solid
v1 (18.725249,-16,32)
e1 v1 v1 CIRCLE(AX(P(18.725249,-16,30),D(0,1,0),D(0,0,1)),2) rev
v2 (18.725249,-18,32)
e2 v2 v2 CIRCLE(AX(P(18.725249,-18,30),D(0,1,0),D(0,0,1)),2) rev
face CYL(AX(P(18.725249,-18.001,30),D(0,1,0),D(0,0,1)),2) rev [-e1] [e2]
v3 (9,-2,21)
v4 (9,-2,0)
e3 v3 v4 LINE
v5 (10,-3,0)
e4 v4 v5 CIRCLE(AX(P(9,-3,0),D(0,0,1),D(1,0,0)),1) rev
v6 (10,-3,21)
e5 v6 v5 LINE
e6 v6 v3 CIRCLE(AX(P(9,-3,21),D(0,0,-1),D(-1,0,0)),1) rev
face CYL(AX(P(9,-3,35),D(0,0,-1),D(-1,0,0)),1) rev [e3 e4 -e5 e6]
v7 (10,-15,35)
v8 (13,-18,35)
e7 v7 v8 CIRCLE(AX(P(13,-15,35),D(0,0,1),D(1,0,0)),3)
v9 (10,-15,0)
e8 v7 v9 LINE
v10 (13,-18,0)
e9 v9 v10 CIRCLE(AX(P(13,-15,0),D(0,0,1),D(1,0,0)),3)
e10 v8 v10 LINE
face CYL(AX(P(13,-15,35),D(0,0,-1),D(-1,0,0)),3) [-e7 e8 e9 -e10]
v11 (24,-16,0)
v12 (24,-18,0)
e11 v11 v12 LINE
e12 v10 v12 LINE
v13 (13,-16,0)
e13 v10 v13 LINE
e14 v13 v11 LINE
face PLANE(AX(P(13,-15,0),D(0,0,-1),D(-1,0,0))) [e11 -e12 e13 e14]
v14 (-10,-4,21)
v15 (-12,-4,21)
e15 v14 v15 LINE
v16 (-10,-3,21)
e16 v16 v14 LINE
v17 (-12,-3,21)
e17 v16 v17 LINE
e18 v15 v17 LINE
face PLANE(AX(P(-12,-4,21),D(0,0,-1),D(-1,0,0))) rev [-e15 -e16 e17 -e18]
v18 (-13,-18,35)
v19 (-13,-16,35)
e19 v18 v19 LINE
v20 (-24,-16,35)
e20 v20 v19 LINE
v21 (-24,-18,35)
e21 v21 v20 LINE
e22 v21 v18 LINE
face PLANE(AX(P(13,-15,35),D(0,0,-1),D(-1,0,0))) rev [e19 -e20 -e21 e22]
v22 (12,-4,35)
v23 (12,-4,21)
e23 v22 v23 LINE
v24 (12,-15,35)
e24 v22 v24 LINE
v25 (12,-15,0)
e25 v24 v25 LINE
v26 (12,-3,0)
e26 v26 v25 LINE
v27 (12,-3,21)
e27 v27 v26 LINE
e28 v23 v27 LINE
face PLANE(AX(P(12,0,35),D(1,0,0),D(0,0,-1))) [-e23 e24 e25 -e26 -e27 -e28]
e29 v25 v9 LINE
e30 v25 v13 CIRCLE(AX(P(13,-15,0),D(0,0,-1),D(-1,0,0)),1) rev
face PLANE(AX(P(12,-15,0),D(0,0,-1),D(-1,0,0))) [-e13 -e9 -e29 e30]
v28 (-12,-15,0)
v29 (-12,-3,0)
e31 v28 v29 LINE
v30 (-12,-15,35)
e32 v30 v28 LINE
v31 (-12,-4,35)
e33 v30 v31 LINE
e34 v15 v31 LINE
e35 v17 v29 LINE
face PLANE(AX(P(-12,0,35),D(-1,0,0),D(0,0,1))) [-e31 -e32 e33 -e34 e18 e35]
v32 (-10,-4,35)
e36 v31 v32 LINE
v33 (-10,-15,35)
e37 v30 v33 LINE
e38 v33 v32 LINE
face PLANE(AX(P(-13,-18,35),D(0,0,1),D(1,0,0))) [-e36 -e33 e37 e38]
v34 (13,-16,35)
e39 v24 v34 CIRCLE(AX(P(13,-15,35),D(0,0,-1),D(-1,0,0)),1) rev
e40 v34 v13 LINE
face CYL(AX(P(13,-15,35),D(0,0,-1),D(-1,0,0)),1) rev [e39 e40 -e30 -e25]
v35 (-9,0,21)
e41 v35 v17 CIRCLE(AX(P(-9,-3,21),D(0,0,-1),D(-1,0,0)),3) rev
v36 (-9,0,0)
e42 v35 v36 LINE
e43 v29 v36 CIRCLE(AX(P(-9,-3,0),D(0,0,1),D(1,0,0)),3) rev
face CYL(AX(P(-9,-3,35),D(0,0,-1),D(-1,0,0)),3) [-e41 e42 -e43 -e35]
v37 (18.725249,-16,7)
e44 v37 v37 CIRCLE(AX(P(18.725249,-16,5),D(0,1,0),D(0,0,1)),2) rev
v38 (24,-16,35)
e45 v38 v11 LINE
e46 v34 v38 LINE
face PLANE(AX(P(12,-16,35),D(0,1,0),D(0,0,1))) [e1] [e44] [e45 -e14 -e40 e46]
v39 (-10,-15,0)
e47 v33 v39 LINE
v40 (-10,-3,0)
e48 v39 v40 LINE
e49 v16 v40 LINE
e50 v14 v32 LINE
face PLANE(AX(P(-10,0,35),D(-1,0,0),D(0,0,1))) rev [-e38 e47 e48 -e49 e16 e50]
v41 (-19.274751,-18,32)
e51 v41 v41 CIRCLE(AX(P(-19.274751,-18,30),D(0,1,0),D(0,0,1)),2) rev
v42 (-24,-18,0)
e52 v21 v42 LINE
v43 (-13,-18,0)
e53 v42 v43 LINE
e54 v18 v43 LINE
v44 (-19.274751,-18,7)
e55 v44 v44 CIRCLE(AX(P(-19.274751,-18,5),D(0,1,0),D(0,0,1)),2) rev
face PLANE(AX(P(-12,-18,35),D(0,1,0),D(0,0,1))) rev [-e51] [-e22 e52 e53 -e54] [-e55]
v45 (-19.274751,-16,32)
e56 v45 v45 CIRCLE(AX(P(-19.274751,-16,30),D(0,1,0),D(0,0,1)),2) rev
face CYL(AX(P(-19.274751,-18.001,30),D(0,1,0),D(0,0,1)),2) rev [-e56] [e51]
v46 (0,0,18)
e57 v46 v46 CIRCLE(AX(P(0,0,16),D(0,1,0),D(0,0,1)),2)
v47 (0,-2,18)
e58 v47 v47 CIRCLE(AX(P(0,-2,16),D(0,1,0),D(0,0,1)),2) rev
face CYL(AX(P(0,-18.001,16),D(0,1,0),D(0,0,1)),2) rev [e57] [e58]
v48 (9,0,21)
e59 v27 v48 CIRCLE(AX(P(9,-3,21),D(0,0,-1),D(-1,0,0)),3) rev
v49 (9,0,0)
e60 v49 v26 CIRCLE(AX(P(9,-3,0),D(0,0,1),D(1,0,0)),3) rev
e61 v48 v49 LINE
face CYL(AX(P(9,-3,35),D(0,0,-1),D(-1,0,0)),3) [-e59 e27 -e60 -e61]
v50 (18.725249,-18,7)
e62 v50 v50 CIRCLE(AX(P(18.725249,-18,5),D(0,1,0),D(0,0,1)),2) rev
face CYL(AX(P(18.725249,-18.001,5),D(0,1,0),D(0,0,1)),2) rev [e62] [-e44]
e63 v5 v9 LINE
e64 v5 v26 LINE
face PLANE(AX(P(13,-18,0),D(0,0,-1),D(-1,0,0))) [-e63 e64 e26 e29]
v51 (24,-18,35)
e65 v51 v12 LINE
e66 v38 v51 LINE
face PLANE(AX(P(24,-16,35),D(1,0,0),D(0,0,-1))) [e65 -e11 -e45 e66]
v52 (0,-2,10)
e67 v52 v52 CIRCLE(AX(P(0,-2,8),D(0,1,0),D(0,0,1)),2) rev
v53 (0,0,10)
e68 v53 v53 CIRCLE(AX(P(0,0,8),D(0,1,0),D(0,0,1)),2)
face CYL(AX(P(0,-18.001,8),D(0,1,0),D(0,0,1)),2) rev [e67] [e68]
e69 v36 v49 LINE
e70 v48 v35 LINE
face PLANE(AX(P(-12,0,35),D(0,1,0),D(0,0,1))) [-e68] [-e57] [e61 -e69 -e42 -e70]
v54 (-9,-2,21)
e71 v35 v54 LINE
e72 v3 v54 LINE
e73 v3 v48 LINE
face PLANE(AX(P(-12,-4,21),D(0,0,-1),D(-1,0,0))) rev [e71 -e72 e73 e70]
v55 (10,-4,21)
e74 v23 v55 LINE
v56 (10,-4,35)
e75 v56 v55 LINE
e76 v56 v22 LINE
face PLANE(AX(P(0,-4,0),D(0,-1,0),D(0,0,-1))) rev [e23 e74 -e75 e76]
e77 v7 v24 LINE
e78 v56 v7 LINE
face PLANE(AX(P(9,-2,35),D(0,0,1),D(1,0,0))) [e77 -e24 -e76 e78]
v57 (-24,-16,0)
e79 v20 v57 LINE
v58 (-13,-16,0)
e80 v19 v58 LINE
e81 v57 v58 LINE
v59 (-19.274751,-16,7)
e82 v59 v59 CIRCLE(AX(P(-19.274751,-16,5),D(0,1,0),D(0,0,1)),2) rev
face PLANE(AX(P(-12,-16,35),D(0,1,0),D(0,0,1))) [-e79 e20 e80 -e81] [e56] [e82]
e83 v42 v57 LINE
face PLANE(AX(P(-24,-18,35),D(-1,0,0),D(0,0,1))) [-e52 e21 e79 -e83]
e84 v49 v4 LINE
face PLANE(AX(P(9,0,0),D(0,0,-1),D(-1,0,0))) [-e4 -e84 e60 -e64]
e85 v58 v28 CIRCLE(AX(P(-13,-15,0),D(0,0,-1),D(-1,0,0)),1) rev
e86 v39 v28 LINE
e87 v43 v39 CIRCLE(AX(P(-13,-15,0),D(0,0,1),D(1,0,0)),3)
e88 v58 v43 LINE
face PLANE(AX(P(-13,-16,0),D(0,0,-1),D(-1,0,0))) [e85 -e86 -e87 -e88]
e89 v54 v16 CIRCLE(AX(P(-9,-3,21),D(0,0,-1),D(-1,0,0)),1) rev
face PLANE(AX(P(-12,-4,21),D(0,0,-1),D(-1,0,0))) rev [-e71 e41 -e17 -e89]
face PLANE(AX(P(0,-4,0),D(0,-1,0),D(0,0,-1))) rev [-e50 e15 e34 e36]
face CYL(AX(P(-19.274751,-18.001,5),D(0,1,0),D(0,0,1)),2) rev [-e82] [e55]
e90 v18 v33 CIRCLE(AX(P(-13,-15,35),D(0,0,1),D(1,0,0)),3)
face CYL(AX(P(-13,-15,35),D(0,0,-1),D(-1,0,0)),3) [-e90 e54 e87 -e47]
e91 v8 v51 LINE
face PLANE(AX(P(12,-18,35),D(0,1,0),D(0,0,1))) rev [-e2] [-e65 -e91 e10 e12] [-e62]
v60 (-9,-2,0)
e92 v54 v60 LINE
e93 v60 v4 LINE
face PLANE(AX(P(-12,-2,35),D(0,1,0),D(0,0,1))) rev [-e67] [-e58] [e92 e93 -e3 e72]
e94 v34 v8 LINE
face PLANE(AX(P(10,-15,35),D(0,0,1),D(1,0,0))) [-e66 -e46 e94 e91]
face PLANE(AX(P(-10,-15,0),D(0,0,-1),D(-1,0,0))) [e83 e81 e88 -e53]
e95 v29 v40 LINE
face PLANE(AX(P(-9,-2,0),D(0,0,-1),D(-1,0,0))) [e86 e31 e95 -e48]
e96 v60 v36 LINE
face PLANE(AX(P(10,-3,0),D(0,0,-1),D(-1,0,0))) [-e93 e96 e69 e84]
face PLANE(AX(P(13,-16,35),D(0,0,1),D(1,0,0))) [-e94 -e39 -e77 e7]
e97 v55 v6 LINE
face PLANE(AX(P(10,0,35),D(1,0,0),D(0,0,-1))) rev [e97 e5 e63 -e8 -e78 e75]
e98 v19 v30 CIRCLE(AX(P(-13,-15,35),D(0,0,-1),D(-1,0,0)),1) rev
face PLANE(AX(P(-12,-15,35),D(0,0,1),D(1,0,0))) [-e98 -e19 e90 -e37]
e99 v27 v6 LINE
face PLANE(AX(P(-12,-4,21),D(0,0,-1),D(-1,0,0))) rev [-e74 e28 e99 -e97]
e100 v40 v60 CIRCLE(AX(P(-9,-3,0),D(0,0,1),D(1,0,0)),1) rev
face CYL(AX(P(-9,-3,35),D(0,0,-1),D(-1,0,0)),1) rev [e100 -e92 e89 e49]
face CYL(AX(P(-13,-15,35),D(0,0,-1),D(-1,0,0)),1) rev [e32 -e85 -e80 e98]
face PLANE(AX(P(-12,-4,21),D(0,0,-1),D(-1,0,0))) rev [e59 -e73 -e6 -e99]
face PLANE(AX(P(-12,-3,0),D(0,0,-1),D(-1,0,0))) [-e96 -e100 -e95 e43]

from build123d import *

# Parameters (mm, degrees)
BASE_FLANGE2_DEPTH = 35
SKETCH12_W         = 24
SKETCH12_H         = 14
CUT_EXTRUDE1_DEPTH = 4
CUT_EXTRUDE2_REACH = 48.098
SKETCH13_R         = 2


# Sheet-metal steps are written as plain solids
with BuildPart() as part:
    # Sketch7 → Base-Flange2 (new body)
    with BuildSketch(Plane.XY):
        with BuildLine():
            Line((-24, -16), (-13, -16))
            ThreePointArc((-13, -16), (-12.292893219, -15.707106781), (-12, -15))
            Line((-12, -15), (-12, -3))
            ThreePointArc((-12, -3), (-11.121320344, -0.878679656), (-9, 0))
            Line((-9, 0), (9, 0))
            ThreePointArc((9, 0), (11.121320344, -0.878679656), (12, -3))
            Line((12, -3), (12, -15))
            ThreePointArc((12, -15), (12.292893219, -15.707106781), (13, -16))
            Line((13, -16), (24, -16))
            Line((24, -16), (24, -18))
            Line((24, -18), (13, -18))
            ThreePointArc((13, -18), (10.878679656, -17.121320344), (10, -15))
            Line((10, -15), (10, -3))
            ThreePointArc((10, -3), (9.707106781, -2.292893219), (9, -2))
            Line((9, -2), (-9, -2))
            ThreePointArc((-9, -2), (-9.707106781, -2.292893219), (-10, -3))
            Line((-10, -3), (-10, -15))
            ThreePointArc((-10, -15), (-10.878679656, -17.121320344), (-13, -18))
            Line((-13, -18), (-24, -18))
            Line((-24, -18), (-24, -16))
        make_face()
    extrude(amount=BASE_FLANGE2_DEPTH)

    # Sketch12 → Cut-Extrude1 (cut)
    with BuildSketch(Plane(origin=(0, 0, 0), x_dir=(1, 0, 0), z_dir=(0, 1, 0))):
        with Locations((0, -28)):
            Rectangle(SKETCH12_W, SKETCH12_H)
    extrude(amount=-CUT_EXTRUDE1_DEPTH, mode=Mode.SUBTRACT)

    # Sketch13 → Cut-Extrude2 (cut, up to next)
    with BuildSketch(Plane(origin=(0, 0, 0), x_dir=(1, 0, 0), z_dir=(0, 1, 0)), mode=Mode.PRIVATE) as cut_extrude2_sk1:
        with Locations(Location((18.725249298, -5, 0), (0, 0, 270))):
            Circle(SKETCH13_R)
    cut_extrude2_tool1 = extrude(cut_extrude2_sk1.sketch, amount=-CUT_EXTRUDE2_REACH, mode=Mode.PRIVATE) & part.part
    # Sketch13 → Cut-Extrude2 (cut, up to next)
    with BuildSketch(Plane(origin=(0, 0, 0), x_dir=(1, 0, 0), z_dir=(0, 1, 0)), mode=Mode.PRIVATE) as cut_extrude2_sk2:
        with Locations(Location((-19.274750702, -5, 0), (0, 0, 270))):
            Circle(SKETCH13_R)
    cut_extrude2_tool2 = extrude(cut_extrude2_sk2.sketch, amount=-CUT_EXTRUDE2_REACH, mode=Mode.PRIVATE) & part.part
    # Sketch13 → Cut-Extrude2 (cut, up to next)
    with BuildSketch(Plane(origin=(0, 0, 0), x_dir=(1, 0, 0), z_dir=(0, 1, 0)), mode=Mode.PRIVATE) as cut_extrude2_sk3:
        with Locations(Location((0, -8, 0), (0, 0, 270))):
            Circle(SKETCH13_R)
    cut_extrude2_tool3 = extrude(cut_extrude2_sk3.sketch, amount=-CUT_EXTRUDE2_REACH, mode=Mode.PRIVATE) & part.part
    # Sketch13 → Cut-Extrude2 (cut, up to next)
    with BuildSketch(Plane(origin=(0, 0, 0), x_dir=(1, 0, 0), z_dir=(0, 1, 0)), mode=Mode.PRIVATE) as cut_extrude2_sk4:
        with Locations(Location((0, -16, 0), (0, 0, 270))):
            Circle(SKETCH13_R)
    cut_extrude2_tool4 = extrude(cut_extrude2_sk4.sketch, amount=-CUT_EXTRUDE2_REACH, mode=Mode.PRIVATE) & part.part
    # Sketch13 → Cut-Extrude2 (cut, up to next)
    with BuildSketch(Plane(origin=(0, 0, 0), x_dir=(1, 0, 0), z_dir=(0, 1, 0)), mode=Mode.PRIVATE) as cut_extrude2_sk5:
        with Locations(Location((18.725249298, -30, 0), (0, 0, 270))):
            Circle(SKETCH13_R)
    cut_extrude2_tool5 = extrude(cut_extrude2_sk5.sketch, amount=-CUT_EXTRUDE2_REACH, mode=Mode.PRIVATE) & part.part
    # Sketch13 → Cut-Extrude2 (cut, up to next)
    with BuildSketch(Plane(origin=(0, 0, 0), x_dir=(1, 0, 0), z_dir=(0, 1, 0)), mode=Mode.PRIVATE) as cut_extrude2_sk6:
        with Locations(Location((-19.274750702, -30, 0), (0, 0, 270))):
            Circle(SKETCH13_R)
    cut_extrude2_tool6 = extrude(cut_extrude2_sk6.sketch, amount=-CUT_EXTRUDE2_REACH, mode=Mode.PRIVATE) & part.part
    add(cut_extrude2_tool1.solids().sort_by_distance((18.725249, 0, 5))[0], mode=Mode.SUBTRACT)
    add(cut_extrude2_tool2.solids().sort_by_distance((-19.274751, 0, 5))[0], mode=Mode.SUBTRACT)
    add(cut_extrude2_tool3.solids().sort_by_distance((0, 0, 8))[0], mode=Mode.SUBTRACT)
    add(cut_extrude2_tool4.solids().sort_by_distance((0, 0, 16))[0], mode=Mode.SUBTRACT)
    add(cut_extrude2_tool5.solids().sort_by_distance((18.725249, 0, 30))[0], mode=Mode.SUBTRACT)
    add(cut_extrude2_tool6.solids().sort_by_distance((-19.274751, 0, 30))[0], mode=Mode.SUBTRACT)


solid = part.part
